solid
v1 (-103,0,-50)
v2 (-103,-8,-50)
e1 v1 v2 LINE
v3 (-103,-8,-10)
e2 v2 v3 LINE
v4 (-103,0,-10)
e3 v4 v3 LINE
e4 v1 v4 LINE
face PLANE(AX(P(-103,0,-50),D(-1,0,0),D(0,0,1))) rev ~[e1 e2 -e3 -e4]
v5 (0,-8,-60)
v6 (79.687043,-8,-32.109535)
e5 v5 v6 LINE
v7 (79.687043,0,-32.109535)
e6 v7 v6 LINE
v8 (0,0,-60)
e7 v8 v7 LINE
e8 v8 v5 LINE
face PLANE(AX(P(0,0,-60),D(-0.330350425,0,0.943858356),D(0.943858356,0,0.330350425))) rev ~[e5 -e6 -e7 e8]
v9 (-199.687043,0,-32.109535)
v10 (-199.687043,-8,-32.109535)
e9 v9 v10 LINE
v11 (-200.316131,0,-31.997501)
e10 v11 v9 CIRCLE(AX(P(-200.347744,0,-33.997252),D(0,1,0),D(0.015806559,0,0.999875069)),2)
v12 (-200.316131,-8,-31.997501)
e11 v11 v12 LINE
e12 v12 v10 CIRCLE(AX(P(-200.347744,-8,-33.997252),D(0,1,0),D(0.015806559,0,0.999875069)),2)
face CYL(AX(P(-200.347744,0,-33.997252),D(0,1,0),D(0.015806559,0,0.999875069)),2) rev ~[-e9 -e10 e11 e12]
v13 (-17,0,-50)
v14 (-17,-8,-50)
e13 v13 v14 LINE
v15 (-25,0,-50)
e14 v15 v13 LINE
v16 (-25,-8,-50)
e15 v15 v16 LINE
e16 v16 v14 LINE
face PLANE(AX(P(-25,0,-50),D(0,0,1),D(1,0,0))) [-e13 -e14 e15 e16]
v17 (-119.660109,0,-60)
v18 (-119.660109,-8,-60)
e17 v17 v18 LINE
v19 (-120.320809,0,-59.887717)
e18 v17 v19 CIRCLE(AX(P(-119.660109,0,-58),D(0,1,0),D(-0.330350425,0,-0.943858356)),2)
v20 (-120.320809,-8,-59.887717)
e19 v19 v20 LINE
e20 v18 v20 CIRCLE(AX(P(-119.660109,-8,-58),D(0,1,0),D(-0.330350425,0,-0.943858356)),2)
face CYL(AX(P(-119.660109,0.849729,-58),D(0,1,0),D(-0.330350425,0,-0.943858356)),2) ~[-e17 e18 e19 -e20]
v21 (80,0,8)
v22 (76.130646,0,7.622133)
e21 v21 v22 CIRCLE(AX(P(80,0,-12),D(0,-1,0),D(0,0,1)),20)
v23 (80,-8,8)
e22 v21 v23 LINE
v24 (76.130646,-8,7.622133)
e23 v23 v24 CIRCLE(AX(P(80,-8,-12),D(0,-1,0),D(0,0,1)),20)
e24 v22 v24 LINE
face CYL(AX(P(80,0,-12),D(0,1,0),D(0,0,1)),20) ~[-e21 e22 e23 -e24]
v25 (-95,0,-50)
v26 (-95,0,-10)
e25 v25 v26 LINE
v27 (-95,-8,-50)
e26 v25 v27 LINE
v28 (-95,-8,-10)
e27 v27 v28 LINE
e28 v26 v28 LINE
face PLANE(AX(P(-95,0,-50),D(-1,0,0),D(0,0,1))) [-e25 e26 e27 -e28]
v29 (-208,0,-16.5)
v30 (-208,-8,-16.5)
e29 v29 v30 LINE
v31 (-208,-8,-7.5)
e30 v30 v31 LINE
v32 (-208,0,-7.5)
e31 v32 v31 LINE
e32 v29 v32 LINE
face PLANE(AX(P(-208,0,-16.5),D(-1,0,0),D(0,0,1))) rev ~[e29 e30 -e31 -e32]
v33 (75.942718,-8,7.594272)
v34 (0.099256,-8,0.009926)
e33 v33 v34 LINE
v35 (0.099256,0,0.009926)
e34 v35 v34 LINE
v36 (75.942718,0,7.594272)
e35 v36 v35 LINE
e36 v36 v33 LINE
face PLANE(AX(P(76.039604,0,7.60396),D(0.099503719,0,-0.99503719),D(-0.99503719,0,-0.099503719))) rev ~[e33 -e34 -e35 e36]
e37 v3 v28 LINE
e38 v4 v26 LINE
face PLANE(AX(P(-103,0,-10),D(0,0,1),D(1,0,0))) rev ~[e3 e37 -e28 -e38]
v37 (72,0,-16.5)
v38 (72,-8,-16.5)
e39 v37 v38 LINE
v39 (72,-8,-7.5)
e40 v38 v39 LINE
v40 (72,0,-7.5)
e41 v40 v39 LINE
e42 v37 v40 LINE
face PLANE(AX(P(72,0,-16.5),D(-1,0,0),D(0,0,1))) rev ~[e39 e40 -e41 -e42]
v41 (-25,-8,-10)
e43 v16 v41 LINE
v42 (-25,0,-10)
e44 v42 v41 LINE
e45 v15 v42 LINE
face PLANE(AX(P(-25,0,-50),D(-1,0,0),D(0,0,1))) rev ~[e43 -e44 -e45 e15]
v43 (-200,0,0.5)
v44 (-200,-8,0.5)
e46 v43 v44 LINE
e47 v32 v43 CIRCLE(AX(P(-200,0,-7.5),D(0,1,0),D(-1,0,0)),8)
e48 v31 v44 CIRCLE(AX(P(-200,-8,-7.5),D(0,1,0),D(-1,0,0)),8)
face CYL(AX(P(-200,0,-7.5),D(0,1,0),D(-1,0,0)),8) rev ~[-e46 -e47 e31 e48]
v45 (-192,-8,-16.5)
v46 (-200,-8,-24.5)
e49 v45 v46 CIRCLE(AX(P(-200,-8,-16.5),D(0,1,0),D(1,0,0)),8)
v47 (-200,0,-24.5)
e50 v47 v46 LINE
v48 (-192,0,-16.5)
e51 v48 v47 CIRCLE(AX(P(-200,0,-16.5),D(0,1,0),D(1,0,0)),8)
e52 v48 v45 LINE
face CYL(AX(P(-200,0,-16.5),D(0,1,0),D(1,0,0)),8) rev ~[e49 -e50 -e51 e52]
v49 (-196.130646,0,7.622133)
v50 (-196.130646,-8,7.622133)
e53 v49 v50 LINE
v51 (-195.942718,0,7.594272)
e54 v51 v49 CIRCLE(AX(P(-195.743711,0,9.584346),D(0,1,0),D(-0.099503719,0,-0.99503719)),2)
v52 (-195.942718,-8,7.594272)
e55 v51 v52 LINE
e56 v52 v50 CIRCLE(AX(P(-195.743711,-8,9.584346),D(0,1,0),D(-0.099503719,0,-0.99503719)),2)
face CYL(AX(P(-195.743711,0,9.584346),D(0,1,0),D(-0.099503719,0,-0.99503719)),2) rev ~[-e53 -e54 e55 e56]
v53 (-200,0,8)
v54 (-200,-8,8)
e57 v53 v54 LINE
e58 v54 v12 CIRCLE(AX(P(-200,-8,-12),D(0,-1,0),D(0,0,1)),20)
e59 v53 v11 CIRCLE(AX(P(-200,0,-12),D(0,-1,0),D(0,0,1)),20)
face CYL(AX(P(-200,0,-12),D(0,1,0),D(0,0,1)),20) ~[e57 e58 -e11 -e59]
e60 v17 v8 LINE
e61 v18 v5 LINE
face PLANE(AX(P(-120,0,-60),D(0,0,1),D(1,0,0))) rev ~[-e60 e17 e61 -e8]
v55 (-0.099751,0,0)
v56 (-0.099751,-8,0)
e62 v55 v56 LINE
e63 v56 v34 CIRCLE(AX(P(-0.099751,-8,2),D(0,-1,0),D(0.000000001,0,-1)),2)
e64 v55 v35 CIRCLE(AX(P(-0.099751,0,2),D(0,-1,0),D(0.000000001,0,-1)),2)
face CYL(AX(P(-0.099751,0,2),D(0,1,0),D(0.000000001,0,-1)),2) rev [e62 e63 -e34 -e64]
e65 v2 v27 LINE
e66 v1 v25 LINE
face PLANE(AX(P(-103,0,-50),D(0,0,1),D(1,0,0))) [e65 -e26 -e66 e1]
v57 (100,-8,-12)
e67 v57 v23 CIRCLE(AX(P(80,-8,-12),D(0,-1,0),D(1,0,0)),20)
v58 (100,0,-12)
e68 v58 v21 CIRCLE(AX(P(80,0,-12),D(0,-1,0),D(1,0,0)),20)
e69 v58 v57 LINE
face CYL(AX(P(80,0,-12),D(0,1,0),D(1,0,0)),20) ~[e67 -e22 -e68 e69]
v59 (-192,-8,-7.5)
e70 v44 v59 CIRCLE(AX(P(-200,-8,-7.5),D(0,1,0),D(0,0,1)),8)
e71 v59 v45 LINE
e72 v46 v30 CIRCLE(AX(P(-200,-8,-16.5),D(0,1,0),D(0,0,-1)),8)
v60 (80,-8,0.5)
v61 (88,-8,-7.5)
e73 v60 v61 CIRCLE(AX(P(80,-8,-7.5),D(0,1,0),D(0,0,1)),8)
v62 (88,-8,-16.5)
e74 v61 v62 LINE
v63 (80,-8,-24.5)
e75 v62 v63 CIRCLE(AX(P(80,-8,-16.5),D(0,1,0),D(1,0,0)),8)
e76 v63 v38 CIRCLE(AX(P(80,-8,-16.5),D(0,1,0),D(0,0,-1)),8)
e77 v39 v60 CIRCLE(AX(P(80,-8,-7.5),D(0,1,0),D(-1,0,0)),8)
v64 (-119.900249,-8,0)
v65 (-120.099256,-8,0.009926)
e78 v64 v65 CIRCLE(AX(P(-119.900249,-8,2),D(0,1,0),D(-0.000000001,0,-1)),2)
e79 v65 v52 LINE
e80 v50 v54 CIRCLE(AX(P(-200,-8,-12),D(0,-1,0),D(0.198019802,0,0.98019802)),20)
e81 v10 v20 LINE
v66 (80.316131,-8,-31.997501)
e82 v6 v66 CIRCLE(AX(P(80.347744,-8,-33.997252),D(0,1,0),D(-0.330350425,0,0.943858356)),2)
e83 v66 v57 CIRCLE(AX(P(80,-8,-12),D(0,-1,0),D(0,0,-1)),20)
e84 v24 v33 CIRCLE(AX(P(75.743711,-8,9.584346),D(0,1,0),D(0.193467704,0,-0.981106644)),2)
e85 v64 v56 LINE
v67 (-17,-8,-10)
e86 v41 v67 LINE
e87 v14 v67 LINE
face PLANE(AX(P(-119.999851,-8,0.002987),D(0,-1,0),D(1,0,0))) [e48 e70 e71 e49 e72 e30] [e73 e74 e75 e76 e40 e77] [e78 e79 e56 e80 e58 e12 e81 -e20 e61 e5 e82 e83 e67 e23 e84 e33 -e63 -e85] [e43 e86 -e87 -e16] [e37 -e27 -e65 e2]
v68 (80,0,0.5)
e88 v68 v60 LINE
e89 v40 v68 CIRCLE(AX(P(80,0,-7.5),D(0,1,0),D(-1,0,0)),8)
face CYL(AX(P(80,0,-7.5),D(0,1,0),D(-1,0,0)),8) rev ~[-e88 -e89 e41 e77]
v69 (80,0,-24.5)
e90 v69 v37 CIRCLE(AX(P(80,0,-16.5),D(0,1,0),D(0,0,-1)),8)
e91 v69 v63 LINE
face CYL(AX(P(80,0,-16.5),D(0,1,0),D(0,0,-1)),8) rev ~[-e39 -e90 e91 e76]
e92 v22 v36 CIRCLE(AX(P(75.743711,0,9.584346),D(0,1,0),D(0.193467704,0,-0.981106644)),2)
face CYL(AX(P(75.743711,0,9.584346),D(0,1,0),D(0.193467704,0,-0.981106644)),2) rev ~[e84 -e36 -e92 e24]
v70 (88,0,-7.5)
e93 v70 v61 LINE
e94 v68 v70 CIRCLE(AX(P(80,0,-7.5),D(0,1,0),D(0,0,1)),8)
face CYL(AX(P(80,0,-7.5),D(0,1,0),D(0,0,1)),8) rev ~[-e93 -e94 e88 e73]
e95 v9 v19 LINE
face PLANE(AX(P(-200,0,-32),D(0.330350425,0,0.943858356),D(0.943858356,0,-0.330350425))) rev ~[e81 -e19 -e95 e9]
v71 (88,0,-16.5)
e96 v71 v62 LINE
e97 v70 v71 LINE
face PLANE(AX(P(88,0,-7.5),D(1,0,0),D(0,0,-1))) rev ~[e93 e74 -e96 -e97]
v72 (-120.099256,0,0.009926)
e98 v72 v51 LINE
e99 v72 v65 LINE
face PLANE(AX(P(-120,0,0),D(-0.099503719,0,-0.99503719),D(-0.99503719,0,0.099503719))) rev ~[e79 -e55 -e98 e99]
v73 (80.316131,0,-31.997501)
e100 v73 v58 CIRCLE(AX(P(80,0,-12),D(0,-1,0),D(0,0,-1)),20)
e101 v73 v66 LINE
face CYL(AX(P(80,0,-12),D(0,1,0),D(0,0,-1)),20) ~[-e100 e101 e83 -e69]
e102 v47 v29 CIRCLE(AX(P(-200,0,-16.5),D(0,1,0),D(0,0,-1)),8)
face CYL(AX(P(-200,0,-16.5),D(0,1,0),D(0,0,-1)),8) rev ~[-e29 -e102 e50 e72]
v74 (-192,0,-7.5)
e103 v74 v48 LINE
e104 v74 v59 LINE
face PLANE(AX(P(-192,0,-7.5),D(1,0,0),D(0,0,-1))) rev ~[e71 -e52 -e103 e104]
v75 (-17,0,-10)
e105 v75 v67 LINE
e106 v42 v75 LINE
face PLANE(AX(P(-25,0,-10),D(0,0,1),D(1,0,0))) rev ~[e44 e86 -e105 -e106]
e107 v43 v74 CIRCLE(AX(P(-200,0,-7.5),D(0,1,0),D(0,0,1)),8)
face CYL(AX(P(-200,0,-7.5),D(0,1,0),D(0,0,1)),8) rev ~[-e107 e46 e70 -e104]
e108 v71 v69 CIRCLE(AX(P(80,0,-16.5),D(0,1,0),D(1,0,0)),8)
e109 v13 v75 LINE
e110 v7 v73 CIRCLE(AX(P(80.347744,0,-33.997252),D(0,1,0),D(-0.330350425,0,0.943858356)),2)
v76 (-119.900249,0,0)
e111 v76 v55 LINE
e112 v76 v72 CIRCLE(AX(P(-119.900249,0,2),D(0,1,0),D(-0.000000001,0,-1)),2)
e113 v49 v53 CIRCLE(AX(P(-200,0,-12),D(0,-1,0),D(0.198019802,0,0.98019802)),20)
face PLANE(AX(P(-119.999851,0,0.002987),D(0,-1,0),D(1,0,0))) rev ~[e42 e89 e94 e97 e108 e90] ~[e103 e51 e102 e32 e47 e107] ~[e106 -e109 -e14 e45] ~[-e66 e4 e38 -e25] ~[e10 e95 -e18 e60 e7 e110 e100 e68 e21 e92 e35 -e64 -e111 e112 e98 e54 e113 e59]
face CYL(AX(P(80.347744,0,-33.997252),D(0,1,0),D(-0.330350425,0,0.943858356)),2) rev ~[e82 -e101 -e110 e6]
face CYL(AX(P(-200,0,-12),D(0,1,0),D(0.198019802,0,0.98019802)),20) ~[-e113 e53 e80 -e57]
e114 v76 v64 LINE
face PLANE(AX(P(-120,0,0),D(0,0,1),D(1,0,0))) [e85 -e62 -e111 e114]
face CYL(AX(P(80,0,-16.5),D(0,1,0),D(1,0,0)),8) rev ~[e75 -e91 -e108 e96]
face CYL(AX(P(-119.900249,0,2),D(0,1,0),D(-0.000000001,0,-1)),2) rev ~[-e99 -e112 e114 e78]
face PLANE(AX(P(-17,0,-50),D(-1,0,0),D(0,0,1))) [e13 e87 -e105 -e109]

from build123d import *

# Parameters (mm, degrees)
F0_W        = 120
F0_H        = 60
F0_W_2      = 8
F0_H_2      = 40
F1_DEPTH    = 8
F2_T1_DEPTH = 8
F2_T3_DEPTH = 9.6994572863


# Not quite as in the source:
# - a fillet or chamfer that OpenCascade refuses, or shapes differently, is made with other operations: its cross-section is extruded or revolved along the edge and cut away or added


with BuildPart() as f1:
    # F0 (on Front) → F1 (new body)
    with BuildSketch(Plane.XZ):
        with Locations((-60, -30)):
            Rectangle(F0_W, F0_H)
        with Locations((-99, -30)):
            Rectangle(F0_W_2, F0_H_2, mode=Mode.SUBTRACT)
        with Locations((-21, -30)):
            Rectangle(F0_W_2, F0_H_2, mode=Mode.SUBTRACT)
        with BuildLine():
            Line((76.0396039604, 7.603960396), (0, 0))
            Line((0, 0), (0, -60))
            Line((0, -60), (80, -32))
            ThreePointArc((80, -32), (60.0992561958, -13.9900743804), (76.0396039604, 7.603960396))
        make_face()
        with BuildLine():
            Line((-120, -60), (-120, 0))
            Line((-120, 0), (-196.0396039604, 7.603960396))
            ThreePointArc((-196.0396039604, 7.603960396), (-184.5208540159, 0.6647558051), (-180, -12))
            ThreePointArc((-180, -12), (-185.8578643763, -26.1421356237), (-200, -32))
            Line((-200, -32), (-120, -60))
        make_face()
        with BuildLine():
            ThreePointArc((80, 8), (78.0099256196, 7.9007438042), (76.0396039604, 7.603960396))
            Line((76.0396039604, 7.603960396), (80, 8))
        make_face()
        with BuildLine():
            Line((80, 8), (76.0396039604, 7.603960396))
            ThreePointArc((76.0396039604, 7.603960396), (60.0992561958, -13.9900743804), (80, -32))
            Line((80, -32), (80, -24.5))
            ThreePointArc((80, -24.5), (74.3431457505, -22.1568542495), (72, -16.5))
            Line((72, -16.5), (72, -7.5))
            ThreePointArc((72, -7.5), (74.3431457505, -1.8431457505), (80, 0.5))
            Line((80, 0.5), (80, 8))
        make_face()
        with BuildLine():
            ThreePointArc((-180, -12), (-184.5208540159, 0.6647558051), (-196.0396039604, 7.603960396))
            Line((-196.0396039604, 7.603960396), (-200, 8))
            Line((-200, 8), (-200, 0.5))
            ThreePointArc((-200, 0.5), (-194.3431457505, -1.8431457505), (-192, -7.5))
            Line((-192, -7.5), (-192, -16.5))
            ThreePointArc((-192, -16.5), (-194.3431457505, -22.1568542495), (-200, -24.5))
            Line((-200, -24.5), (-200, -32))
            ThreePointArc((-200, -32), (-185.8578643763, -26.1421356237), (-180, -12))
        make_face()
        with BuildLine():
            Line((-200, 8), (-196.0396039604, 7.603960396))
            ThreePointArc((-196.0396039604, 7.603960396), (-198.0099256196, 7.9007438042), (-200, 8))
        make_face()
        with BuildLine():
            Line((80, -24.5), (80, -32))
            ThreePointArc((80, -32), (94.1421356237, -26.1421356237), (100, -12))
            ThreePointArc((100, -12), (94.1421356237, 2.1421356237), (80, 8))
            Line((80, 8), (80, 0.5))
            ThreePointArc((80, 0.5), (85.6568542495, -1.8431457505), (88, -7.5))
            Line((88, -7.5), (88, -16.5))
            ThreePointArc((88, -16.5), (85.6568542495, -22.1568542495), (80, -24.5))
        make_face()
        with BuildLine():
            ThreePointArc((-200, 8), (-220, -12), (-200, -32))
            Line((-200, -32), (-200, -24.5))
            ThreePointArc((-200, -24.5), (-205.6568542495, -22.1568542495), (-208, -16.5))
            Line((-208, -16.5), (-208, -7.5))
            ThreePointArc((-208, -7.5), (-205.6568542495, -1.8431457505), (-200, 0.5))
            Line((-200, 0.5), (-200, 8))
        make_face()
    extrude(amount=F1_DEPTH)

    # F2: fillet of radius 2 on 7 edges, made by hand

    # F2_s2 → F2_t1 (join)
    with BuildSketch(Plane.XZ):
        with BuildLine():
            ThreePointArc((-119.9002487578, 0), (-119.9998761615, 0.0024829462), (-120.0992561958, 0.0099256196))
            Line((-120.0992561958, 0.0099256196), (-120, 0))
            Line((-120, 0), (-119.9002487578, 0))
        make_face()
        with BuildLine():
            ThreePointArc((-0.0997512422, 0), (-0.0001238385, 0.0024829462), (0.0992561958, 0.0099256196))
            Line((0.0992561958, 0.0099256196), (0, 0))
            Line((0, 0), (-0.0997512422, 0))
        make_face()
        with BuildLine():
            ThreePointArc((-200.316131174, -31.9975013709), (-199.9970841579, -32.0282320894), (-199.687043442, -32.1095347953))
            Line((-199.687043442, -32.1095347953), (-200, -32))
            ThreePointArc((-200, -32), (-200.1580705241, -31.999375333), (-200.316131174, -31.9975013709))
        make_face()
        with BuildLine():
            ThreePointArc((79.687043442, -32.1095347953), (79.997084158, -32.0282320894), (80.316131174, -31.9975013709))
            ThreePointArc((80.316131174, -31.9975013709), (80.1580705241, -31.999375333), (80, -32))
            Line((80, -32), (79.687043442, -32.1095347953))
        make_face()
        with BuildLine():
            ThreePointArc((76.1306459256, 7.6221328873), (76.0370129468, 7.6059696483), (75.9427179562, 7.5942717956))
            Line((75.9427179562, 7.5942717956), (76.0396039604, 7.603960396))
            ThreePointArc((76.0396039604, 7.603960396), (76.0851143987, 7.6130994677), (76.1306459256, 7.6221328873))
        make_face()
        with BuildLine():
            ThreePointArc((-195.9427179562, 7.5942717956), (-196.0370129468, 7.6059696483), (-196.1306459256, 7.6221328873))
            ThreePointArc((-196.1306459256, 7.6221328873), (-196.0851143987, 7.6130994677), (-196.0396039604, 7.603960396))
            Line((-196.0396039604, 7.603960396), (-195.9427179562, 7.5942717956))
        make_face()
    extrude(amount=F2_T1_DEPTH)

    # F2_s4 → F2_t3 (cut)
    with BuildSketch(Plane.XZ.offset(-0.8497286432)):
        with BuildLine():
            ThreePointArc((-120.3208093922, -59.8877167127), (-119.9951955274, -59.9717293711), (-119.6601085427, -60))
            Line((-119.6601085427, -60), (-120, -60))
            Line((-120, -60), (-120.3208093922, -59.8877167127))
        make_face()
    extrude(amount=F2_T3_DEPTH, mode=Mode.SUBTRACT)


solid = f1.part
